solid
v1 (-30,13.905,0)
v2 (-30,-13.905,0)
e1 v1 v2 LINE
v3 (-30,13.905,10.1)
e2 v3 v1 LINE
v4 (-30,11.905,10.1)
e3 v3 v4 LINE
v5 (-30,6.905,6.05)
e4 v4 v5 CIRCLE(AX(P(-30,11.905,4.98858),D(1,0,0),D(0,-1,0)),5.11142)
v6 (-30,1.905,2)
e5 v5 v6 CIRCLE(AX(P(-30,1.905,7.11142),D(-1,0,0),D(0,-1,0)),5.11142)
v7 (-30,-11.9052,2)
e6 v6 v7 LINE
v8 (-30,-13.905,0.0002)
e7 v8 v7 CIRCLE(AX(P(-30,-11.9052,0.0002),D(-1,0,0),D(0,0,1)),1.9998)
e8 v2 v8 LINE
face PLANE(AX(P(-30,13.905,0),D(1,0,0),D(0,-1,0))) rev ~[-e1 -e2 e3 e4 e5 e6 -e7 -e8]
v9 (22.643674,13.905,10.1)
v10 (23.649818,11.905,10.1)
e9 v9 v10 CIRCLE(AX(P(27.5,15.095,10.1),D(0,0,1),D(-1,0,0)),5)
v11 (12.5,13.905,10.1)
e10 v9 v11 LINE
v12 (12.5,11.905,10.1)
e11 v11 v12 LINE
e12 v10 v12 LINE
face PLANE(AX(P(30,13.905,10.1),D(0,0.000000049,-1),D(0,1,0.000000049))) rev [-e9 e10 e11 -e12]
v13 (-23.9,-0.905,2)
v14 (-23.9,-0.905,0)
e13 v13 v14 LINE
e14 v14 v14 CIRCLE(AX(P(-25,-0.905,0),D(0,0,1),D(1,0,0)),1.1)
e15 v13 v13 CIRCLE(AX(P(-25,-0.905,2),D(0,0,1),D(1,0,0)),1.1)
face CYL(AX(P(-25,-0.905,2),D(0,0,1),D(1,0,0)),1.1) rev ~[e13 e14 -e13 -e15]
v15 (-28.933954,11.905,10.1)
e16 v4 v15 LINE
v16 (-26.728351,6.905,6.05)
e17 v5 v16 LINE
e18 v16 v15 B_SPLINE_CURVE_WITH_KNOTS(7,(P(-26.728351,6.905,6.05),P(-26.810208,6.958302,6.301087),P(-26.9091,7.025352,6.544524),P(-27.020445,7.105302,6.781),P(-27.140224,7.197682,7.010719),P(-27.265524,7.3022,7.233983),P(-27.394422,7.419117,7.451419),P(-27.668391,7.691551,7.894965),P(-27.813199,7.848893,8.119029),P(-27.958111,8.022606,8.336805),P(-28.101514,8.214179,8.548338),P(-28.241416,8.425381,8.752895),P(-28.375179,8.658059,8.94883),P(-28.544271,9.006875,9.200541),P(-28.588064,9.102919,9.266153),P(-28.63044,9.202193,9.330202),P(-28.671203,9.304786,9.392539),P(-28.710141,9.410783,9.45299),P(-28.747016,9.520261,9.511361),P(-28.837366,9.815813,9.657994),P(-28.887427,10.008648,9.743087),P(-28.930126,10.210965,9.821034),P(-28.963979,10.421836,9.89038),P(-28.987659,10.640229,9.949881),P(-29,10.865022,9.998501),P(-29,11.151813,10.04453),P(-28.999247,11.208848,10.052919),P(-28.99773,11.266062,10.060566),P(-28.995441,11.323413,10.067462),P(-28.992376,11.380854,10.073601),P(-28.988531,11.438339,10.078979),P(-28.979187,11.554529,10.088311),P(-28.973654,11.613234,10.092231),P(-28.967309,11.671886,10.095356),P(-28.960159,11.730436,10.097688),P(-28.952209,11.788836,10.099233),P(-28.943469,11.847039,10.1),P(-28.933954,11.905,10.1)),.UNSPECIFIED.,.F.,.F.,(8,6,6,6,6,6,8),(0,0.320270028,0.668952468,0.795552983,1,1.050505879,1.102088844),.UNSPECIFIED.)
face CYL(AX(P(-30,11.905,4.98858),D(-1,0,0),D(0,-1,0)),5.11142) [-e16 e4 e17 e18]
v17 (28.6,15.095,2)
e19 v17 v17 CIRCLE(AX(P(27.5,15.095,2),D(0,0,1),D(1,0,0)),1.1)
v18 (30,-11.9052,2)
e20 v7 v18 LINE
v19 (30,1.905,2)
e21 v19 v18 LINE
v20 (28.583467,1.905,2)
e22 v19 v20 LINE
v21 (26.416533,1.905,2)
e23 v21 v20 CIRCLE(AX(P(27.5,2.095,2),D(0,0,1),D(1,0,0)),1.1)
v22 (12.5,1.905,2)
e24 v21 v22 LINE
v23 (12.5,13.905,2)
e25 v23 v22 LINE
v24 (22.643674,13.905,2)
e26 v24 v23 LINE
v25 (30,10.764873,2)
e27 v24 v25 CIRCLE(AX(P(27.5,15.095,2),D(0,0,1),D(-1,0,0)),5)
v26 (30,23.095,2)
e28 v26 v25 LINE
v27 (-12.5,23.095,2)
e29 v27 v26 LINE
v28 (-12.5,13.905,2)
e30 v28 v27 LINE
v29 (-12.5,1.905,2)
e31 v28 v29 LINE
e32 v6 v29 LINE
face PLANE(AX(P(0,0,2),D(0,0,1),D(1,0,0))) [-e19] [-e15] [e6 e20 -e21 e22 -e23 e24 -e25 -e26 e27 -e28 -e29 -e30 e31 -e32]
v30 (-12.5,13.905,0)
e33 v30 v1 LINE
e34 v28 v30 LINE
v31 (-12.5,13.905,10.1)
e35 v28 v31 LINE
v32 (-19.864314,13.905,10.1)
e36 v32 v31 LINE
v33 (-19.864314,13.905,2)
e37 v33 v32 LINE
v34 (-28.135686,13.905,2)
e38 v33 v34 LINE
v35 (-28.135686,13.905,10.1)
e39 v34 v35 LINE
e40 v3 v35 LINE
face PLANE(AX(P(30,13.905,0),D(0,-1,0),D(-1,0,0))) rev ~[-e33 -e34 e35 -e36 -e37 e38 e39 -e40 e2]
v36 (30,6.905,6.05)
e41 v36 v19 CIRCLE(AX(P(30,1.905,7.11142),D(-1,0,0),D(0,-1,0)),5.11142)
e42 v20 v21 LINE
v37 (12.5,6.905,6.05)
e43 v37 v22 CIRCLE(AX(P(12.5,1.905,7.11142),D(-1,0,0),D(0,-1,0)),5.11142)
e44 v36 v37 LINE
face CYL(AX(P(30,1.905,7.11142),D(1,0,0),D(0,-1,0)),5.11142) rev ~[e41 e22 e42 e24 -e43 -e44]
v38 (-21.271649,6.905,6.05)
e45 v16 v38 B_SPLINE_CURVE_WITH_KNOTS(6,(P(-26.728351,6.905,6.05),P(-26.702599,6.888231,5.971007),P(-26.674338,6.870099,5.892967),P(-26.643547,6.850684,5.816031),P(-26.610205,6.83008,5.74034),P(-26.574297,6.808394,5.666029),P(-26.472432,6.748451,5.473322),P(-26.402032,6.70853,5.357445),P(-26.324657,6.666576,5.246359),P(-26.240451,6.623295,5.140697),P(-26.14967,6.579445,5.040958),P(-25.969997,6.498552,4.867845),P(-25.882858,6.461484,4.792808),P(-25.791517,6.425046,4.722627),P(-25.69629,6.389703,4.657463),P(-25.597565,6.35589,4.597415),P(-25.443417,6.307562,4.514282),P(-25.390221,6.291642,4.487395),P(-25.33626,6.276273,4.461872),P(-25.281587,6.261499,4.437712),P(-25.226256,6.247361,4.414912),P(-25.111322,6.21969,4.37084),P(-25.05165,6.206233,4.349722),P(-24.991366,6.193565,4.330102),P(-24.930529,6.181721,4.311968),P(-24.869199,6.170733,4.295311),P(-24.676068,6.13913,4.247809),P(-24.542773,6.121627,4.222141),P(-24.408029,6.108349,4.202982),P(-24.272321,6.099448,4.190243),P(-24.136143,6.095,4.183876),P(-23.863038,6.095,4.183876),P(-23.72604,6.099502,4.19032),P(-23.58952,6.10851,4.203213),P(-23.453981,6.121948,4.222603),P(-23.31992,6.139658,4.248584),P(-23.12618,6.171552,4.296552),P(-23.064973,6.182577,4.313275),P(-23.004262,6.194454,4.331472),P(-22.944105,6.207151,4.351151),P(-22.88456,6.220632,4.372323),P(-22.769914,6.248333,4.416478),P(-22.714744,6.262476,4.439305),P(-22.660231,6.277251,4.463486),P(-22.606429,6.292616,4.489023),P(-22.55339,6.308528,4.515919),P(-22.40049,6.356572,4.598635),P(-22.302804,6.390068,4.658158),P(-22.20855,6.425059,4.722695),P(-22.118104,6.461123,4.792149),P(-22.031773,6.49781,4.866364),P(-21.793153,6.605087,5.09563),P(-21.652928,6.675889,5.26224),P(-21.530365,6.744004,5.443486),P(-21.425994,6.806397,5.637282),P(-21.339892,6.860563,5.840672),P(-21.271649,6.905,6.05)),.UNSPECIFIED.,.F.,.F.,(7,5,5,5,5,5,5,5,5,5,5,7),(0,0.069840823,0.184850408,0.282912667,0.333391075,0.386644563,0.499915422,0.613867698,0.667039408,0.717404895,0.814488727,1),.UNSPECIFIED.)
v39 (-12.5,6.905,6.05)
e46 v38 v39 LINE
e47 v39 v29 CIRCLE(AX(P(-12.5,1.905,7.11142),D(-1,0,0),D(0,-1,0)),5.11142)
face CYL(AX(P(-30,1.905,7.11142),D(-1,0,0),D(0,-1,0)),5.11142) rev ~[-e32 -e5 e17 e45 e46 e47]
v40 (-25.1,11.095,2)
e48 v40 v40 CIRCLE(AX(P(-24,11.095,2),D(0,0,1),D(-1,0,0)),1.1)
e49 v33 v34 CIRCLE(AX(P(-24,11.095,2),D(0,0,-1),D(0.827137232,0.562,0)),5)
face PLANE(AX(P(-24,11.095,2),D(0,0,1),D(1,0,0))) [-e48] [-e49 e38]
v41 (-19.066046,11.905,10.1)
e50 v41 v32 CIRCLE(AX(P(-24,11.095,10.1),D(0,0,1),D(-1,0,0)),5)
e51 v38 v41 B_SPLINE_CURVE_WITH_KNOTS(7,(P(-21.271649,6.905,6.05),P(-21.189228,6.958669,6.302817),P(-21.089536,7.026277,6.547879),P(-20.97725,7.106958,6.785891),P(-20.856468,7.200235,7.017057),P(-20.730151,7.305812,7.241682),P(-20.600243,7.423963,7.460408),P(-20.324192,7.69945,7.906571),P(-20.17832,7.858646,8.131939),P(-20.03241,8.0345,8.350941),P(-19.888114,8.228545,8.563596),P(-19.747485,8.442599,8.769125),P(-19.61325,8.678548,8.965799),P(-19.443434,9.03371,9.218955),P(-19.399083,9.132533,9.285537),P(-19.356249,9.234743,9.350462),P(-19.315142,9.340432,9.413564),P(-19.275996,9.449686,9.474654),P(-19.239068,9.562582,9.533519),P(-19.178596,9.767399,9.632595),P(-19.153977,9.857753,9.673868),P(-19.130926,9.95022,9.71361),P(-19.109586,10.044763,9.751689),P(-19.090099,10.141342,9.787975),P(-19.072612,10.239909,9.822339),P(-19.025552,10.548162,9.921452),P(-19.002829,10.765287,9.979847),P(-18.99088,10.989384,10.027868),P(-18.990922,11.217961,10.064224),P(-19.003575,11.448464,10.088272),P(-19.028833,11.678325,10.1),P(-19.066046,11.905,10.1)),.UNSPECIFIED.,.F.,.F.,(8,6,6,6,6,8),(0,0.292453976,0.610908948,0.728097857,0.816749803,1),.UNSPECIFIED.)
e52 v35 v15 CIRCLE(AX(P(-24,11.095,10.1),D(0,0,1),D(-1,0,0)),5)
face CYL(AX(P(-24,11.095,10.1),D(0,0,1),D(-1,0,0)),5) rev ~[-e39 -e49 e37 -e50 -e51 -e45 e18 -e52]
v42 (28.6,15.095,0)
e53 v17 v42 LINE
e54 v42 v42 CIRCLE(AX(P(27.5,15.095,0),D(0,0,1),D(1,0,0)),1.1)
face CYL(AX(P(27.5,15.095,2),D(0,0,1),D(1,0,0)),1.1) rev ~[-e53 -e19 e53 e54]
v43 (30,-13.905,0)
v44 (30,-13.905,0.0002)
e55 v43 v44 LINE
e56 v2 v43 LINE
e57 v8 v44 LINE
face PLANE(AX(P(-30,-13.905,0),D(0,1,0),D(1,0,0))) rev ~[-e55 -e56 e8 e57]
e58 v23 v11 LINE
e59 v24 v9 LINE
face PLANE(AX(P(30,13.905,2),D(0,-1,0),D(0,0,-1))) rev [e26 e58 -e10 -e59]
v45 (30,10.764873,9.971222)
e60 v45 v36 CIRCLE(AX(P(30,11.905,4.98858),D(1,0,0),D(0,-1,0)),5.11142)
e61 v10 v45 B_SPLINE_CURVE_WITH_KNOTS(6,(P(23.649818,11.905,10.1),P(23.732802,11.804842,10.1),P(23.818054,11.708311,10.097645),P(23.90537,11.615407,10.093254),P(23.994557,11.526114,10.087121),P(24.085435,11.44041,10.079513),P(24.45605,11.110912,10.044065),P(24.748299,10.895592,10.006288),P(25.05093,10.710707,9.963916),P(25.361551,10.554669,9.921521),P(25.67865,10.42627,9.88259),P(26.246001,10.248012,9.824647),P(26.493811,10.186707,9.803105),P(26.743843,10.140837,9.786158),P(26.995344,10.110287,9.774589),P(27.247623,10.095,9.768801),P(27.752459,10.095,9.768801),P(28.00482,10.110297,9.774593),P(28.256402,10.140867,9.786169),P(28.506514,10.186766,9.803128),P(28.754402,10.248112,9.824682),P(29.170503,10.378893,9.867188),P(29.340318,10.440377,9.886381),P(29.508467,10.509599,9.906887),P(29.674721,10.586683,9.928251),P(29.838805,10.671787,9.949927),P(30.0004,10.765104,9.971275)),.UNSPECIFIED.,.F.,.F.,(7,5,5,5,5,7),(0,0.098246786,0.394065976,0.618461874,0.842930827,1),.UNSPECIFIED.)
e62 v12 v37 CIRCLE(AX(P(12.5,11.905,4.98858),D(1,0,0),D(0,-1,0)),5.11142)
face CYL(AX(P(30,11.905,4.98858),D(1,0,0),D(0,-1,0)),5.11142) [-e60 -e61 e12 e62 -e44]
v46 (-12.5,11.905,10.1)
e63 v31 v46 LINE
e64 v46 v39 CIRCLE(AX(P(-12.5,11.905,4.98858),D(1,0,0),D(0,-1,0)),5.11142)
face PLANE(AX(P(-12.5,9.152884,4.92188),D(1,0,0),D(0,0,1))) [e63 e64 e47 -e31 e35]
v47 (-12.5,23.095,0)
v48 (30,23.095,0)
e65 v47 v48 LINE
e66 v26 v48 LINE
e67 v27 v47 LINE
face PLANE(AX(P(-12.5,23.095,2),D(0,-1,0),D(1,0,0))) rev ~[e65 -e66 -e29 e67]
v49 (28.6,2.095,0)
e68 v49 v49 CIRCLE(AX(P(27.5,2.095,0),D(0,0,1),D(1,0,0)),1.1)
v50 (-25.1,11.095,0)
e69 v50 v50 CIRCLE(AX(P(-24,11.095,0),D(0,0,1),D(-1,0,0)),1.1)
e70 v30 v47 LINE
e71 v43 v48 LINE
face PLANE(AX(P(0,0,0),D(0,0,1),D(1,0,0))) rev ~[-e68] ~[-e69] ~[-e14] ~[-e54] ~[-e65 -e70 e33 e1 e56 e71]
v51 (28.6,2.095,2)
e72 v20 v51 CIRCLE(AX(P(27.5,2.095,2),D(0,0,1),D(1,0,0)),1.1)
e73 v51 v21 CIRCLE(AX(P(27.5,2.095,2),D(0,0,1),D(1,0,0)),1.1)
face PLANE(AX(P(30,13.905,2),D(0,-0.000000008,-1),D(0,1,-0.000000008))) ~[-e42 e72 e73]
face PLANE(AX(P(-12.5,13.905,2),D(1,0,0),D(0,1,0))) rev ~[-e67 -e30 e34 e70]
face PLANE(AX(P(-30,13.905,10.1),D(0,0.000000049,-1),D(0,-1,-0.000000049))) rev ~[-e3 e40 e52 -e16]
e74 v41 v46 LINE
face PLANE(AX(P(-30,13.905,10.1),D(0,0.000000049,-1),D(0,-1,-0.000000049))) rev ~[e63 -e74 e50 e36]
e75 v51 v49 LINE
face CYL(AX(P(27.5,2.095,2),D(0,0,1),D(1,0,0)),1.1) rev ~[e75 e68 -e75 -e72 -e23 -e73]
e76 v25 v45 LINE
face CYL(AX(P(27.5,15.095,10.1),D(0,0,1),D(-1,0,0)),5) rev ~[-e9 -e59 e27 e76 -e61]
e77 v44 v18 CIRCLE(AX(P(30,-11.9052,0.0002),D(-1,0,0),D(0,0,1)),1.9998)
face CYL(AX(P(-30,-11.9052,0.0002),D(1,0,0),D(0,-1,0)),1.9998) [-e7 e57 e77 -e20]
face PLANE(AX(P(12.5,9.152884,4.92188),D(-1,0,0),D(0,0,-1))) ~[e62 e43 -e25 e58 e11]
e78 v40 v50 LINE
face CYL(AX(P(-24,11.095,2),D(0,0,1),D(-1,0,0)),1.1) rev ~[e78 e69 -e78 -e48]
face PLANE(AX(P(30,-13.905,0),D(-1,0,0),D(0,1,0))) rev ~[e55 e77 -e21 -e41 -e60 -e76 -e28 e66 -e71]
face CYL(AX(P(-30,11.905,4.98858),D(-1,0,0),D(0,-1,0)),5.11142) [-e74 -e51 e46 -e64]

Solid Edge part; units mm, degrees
sketch "Sketch1" plane through (0, 0, 0) normal (0, 0, 1) x (1, 0, 0)
  line L0 (-30, -13.905) -> (30, -13.905)
  line L1 (30, -13.905) -> (30, 13.905)
  line L2 (30, 13.905) -> (-30, 13.905)
  line L3 (-30, 13.905) -> (-30, -13.905)
  dimension "D1" = 60
  dimension "D2" = 27.81
extrude "Protrusion1" add sketch "Sketch1" along normal blind 2
sketch "Sketch2" plane through (0, 0, 2) normal (0, 0, 1) x (1, 0, 0)
  line L0 (30, 13.905) -> (-12.5, 13.905)
  line L1 (-12.5, 13.905) -> (-12.5, 23.095)
  line L2 (-12.5, 23.095) -> (30, 23.095)
  line L3 (30, 23.095) -> (30, 13.905)
  dimension "D1" = 9.19
  dimension "D2" = 42.5
extrude "Extrusionsausprägung_2" add sketch "Sketch2" against normal blind 2
sketch "Sketch3" plane through (0, 4.595, 2) normal (0, 0, 1) x (1, 0, 0)
  circle A0 centre (-25, -5.5) radius 1.1
  circle A1 centre (27.5, 10.5) radius 1.1
  circle A2 centre (27.5, -2.5) radius 1.1
  dimension "D1" = 13
  dimension "D2" = 5
  dimension "D3" = 13
  dimension "D4" = 16
  dimension "D5" = 2.5
  dimension "D6" = 2.2
extrude "Cutout1" cut sketch "Sketch3" against normal up to next
sketch "Sketch4" plane through (-30, 0, 1) normal (-1, 0, 0) x (0, -1, 0)
  line L0 (-13.905, 1) -> (-13.905, 9.1)
  line L1 (-13.905, 9.1) -> (-11.905, 9.1)
  arc A0 (-11.905, 9.1) -> (-6.905, 5.05) centre (-11.905, 3.98858) cw
  arc A1 (-6.905, 5.05) -> (-1.905, 1) centre (-1.905, 6.11142) ccw
  line L2 (-13.905, 1) -> (-1.905, 1)
  dimension "D1" = 8.1
  dimension "D2" = 12
  dimension "D3" = 2
extrude "Extrusionsausprägung_3" add sketch "Sketch4" against normal blind 17.5
fillet "Verrundung_1" radius 2 1 edges at (0, -13.905, 2)
mirror "Mirror1" about plane through (0, 0, 0) normal (1, 0, 0) of "Extrusionsausprägung_3"
sketch "Sketch5" plane through (21.25, 12.905, 10.1) normal (0, 0, 1) x (-1, 0, 0)
  circle A0 centre (-6.25, -2.19) radius 5
  dimension "D1" = 10
extrude "Cutout2" cut sketch "Sketch5" against normal up to vertex (8.1 mm away)
sketch "Sketch6" plane through (-24, 10.405, 2) normal (0, 0, 1) x (-1, 0, 0)
  circle A0 centre (0, -0.69) radius 1.1
  dimension "D1" = 2.2
extrude "Cutout3" cut sketch "Sketch6" against normal through all
sketch "Sketch7" plane through (-21.25, 12.905, 10.1) normal (0, 0, 1) x (-1, 0, 0)
  circle A0 centre (2.75, 1.81) radius 5
  dimension "D1" = 10
extrude "Cutout4" cut sketch "Sketch7" against normal up to vertex (8.1 mm away)
